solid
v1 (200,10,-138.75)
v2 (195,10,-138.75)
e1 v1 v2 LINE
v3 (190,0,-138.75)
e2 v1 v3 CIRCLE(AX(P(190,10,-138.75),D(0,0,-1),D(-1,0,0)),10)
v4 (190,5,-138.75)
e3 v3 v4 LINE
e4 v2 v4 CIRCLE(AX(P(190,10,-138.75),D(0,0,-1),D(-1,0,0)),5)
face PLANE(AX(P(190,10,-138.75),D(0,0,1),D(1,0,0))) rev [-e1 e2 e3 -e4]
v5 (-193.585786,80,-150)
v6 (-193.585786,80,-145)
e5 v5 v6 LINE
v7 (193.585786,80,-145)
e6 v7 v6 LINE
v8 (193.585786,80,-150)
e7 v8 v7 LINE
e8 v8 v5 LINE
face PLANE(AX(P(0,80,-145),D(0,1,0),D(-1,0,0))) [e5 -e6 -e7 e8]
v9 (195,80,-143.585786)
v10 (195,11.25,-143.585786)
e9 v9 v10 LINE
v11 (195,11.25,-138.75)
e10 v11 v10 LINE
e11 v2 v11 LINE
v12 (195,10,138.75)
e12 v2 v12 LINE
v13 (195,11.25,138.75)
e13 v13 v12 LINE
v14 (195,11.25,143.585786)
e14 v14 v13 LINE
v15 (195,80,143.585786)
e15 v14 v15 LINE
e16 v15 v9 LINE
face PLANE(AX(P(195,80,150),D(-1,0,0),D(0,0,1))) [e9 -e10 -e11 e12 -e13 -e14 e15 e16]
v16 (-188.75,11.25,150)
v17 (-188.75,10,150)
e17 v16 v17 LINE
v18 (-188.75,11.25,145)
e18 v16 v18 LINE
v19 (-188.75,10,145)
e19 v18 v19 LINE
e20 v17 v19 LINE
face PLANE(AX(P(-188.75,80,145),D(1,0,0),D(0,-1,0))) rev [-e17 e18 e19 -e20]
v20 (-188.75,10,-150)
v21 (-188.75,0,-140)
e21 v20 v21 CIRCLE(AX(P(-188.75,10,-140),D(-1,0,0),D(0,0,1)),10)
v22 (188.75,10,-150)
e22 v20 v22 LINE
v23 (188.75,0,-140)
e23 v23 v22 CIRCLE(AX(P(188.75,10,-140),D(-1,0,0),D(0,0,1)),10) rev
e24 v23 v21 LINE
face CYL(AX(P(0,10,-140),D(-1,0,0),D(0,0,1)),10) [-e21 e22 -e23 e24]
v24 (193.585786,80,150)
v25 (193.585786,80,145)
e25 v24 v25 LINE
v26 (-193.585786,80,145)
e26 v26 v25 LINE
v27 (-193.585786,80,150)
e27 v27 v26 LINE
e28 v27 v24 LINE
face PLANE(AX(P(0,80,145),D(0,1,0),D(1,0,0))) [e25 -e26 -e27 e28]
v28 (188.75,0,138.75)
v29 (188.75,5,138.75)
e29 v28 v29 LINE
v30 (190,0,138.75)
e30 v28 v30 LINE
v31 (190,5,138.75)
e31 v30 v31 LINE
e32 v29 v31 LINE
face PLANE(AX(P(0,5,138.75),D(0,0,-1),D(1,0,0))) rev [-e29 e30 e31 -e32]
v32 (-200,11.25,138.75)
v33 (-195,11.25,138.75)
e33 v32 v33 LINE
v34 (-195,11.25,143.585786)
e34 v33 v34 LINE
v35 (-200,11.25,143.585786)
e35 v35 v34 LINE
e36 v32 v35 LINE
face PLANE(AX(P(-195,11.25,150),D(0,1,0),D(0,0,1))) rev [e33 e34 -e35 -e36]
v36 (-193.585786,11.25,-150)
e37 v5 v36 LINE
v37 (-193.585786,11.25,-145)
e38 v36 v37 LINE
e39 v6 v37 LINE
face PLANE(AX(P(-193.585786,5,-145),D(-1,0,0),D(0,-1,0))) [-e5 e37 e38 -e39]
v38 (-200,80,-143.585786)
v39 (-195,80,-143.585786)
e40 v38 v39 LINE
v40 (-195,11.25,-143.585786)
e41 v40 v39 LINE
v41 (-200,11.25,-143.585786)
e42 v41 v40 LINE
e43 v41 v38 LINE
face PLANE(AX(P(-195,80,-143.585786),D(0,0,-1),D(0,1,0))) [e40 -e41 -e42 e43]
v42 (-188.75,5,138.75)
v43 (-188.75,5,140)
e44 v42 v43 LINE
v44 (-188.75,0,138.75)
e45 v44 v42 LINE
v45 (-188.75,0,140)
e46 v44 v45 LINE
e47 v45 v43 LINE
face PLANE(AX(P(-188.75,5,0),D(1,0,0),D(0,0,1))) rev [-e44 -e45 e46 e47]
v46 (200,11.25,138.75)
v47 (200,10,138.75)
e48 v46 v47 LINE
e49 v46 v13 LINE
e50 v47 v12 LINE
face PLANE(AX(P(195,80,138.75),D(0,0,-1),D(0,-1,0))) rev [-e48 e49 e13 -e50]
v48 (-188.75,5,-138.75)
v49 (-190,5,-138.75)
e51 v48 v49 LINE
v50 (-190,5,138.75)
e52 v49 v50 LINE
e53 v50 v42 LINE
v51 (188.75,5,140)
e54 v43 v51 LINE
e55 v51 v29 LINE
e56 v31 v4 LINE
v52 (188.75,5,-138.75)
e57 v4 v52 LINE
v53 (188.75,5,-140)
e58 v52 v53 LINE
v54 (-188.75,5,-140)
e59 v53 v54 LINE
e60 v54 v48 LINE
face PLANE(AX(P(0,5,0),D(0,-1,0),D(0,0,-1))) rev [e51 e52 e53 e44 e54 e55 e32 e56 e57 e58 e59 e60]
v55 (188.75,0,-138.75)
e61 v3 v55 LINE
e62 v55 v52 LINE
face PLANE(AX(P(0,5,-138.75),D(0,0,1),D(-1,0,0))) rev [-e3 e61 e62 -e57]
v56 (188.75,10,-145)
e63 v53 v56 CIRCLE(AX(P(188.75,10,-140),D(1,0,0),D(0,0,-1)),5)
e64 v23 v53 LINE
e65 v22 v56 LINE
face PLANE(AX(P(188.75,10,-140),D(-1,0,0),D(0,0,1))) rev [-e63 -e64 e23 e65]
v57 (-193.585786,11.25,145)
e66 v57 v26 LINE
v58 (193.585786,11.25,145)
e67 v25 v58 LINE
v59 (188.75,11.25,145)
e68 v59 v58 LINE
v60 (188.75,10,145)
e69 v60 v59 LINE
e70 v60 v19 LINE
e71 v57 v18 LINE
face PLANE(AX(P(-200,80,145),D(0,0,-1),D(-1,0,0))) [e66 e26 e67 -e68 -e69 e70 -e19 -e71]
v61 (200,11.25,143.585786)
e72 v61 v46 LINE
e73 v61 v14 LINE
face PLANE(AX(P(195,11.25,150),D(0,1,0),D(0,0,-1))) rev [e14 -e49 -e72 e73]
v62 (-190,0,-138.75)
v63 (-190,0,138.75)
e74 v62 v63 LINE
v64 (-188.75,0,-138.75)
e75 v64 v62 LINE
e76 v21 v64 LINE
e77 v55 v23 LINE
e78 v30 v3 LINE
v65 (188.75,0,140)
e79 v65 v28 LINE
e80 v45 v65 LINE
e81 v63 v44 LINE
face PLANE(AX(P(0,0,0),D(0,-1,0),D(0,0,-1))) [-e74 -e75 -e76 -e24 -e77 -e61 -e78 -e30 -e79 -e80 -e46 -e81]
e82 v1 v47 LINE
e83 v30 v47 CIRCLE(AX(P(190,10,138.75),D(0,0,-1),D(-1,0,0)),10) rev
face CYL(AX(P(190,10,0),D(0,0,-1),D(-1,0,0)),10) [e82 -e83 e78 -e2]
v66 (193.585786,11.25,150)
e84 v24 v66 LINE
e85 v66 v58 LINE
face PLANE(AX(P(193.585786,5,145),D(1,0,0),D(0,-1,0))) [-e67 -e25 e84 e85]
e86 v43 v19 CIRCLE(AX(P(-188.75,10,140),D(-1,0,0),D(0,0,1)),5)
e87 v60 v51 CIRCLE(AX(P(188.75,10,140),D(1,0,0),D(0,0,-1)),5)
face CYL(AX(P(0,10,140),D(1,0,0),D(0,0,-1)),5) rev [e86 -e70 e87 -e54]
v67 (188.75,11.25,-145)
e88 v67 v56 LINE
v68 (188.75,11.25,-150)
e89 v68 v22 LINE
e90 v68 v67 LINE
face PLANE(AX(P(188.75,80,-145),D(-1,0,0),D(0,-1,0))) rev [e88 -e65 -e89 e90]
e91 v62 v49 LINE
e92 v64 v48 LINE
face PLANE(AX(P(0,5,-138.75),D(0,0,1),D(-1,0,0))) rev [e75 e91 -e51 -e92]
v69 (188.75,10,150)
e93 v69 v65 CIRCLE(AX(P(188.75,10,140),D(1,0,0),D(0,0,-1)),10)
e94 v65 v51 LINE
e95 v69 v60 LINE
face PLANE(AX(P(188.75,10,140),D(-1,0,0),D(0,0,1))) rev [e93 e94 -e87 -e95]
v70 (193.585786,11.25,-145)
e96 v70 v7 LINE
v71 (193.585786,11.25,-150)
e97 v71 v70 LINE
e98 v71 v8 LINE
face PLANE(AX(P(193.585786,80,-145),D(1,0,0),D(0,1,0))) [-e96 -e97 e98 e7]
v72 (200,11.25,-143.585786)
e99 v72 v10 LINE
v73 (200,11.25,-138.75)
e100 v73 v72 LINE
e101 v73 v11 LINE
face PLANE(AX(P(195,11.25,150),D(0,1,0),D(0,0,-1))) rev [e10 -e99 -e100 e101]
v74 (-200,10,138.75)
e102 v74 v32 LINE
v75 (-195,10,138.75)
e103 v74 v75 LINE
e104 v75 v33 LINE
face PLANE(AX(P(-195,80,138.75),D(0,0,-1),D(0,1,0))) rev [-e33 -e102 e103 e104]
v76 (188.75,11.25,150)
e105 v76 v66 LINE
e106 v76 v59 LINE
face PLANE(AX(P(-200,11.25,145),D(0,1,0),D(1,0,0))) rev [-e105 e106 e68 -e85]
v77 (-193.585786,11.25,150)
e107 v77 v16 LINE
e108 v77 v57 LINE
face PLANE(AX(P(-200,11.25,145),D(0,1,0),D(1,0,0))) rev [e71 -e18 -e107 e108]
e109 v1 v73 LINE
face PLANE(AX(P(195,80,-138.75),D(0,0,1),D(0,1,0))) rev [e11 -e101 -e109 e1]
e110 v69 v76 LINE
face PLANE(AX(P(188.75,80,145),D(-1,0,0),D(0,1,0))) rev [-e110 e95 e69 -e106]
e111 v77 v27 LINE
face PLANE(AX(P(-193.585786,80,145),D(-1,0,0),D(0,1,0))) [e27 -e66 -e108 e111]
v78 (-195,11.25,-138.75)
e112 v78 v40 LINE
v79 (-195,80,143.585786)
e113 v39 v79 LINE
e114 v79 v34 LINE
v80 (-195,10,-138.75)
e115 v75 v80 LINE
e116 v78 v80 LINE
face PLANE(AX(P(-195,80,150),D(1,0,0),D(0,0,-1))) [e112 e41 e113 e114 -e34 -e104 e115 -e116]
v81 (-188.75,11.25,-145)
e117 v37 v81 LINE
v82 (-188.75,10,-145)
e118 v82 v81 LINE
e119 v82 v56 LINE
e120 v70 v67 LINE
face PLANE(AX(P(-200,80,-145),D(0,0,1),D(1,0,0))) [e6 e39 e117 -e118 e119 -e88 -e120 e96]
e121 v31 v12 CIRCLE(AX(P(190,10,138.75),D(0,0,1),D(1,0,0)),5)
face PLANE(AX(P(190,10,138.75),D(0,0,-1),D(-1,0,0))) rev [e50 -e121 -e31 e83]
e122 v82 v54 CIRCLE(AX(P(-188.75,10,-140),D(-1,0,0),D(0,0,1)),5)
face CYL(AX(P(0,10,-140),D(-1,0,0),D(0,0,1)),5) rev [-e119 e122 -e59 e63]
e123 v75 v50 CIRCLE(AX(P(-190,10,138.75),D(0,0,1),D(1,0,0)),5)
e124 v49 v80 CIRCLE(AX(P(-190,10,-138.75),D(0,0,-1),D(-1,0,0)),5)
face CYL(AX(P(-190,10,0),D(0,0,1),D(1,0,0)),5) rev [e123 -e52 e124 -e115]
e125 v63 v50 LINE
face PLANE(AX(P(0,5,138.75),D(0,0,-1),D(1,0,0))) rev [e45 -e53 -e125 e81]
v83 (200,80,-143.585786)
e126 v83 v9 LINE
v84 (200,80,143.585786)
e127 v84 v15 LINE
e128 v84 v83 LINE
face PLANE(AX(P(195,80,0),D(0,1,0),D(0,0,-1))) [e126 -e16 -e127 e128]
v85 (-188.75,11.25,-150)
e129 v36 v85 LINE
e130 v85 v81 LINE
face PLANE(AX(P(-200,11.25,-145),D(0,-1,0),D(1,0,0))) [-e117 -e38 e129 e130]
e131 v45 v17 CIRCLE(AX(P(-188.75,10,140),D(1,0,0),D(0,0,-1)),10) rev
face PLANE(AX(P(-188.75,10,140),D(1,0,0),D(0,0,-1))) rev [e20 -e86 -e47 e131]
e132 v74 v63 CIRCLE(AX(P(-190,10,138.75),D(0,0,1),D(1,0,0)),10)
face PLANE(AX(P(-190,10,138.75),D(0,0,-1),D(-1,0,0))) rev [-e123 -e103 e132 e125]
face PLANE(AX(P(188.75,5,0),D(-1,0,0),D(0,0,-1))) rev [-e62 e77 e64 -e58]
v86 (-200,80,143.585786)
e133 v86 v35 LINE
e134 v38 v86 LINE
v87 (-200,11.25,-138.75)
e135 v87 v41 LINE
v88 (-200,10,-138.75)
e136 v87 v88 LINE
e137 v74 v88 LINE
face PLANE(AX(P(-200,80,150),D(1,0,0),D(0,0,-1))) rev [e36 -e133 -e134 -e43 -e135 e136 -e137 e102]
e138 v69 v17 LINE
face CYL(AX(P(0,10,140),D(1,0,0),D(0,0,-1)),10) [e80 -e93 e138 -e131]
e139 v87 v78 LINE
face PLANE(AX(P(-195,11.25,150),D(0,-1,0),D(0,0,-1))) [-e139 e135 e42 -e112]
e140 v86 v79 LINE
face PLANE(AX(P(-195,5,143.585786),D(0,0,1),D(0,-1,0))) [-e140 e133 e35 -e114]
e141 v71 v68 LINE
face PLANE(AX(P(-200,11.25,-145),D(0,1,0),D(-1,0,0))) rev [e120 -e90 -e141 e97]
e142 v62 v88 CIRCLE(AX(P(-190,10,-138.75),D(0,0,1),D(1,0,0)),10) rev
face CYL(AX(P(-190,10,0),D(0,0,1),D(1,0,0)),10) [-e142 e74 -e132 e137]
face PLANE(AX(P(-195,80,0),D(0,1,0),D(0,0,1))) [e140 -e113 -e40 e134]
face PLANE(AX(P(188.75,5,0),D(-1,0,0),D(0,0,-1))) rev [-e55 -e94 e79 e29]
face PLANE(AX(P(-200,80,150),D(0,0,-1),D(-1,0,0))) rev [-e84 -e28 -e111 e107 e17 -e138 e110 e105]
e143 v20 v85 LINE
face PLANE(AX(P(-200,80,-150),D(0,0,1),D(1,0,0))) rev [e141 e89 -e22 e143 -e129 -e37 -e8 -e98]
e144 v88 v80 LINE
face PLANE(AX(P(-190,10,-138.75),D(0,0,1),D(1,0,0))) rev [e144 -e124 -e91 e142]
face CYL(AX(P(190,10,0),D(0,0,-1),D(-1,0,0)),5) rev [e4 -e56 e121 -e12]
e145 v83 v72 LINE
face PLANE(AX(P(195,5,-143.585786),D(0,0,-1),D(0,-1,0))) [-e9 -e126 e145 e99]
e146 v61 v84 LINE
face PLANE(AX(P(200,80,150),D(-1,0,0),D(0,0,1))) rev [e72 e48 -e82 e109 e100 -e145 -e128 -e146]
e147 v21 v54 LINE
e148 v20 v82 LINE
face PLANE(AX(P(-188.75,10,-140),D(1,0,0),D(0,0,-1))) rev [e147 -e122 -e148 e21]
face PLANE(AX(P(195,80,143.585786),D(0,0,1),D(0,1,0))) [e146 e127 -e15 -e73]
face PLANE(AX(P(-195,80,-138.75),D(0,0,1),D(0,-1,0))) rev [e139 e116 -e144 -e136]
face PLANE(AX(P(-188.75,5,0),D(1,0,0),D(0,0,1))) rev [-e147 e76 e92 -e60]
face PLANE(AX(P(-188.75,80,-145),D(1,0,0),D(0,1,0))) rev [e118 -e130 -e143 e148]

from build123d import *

# Parameters (mm, degrees)
SKETCH1_W              = 400
SKETCH1_H              = 300
BOSS_EXTRUDE1_DEPTH    = 80
SHELL1_T               = -5
CONVERT_SOLID1_START   = -200
CONVERT_SOLID1_DEPTH   = 400
CONVERT_SOLID1_2_DEPTH = 6.414213562
CONVERT_SOLID1_START_2 = 193.585786438
CONVERT_SOLID1_3_DEPTH = 6.414213562
CONVERT_SOLID1_START_3 = -193.585786438
CONVERT_SOLID1_4_DEPTH = 4.835786438
CONVERT_SOLID1_START_4 = 188.75
CONVERT_SOLID1_5_DEPTH = 4.835786438
CONVERT_SOLID1_START_5 = -188.75
CONVERT_SOLID1_6_DEPTH = 377.5
CONVERT_SOLID1_START_6 = -138.75
CONVERT_SOLID1_7_DEPTH = 277.5
CONVERT_SOLID1_8_DEPTH = 277.5


with BuildPart() as part:
    # Sketch1 → Boss-Extrude1 (new body)
    with BuildSketch(Plane(origin=(0, 0, 0), x_dir=(1, 0, 0), z_dir=(0, 1, 0))):
        Rectangle(SKETCH1_W, SKETCH1_H)
    extrude(amount=BOSS_EXTRUDE1_DEPTH)

    # Shell1
    shell1_openings = [part.faces().sort_by_distance(p)[0] for p in [
        (0, 80, 0),
    ]]
    offset(amount=SHELL1_T, openings=shell1_openings, kind=Kind.INTERSECTION)

    # Convert-Solid1: read off the stored shape, not the designer's step
    # Convert-Solid1 outline → Convert-Solid1 (cut)
    with BuildSketch(Plane.YZ.offset(CONVERT_SOLID1_START)):
        with BuildLine():
            Line((11.25, -138.75), (5, -138.75))
            Line((5, -138.75), (5, -140))
            ThreePointArc((5, -140), (6.464466094, -143.535533906), (10, -145))
            Line((10, -145), (80, -145))
            Line((80, -145), (80, -143.585786438))
            Line((80, -143.585786438), (11.25, -143.585786438))
            Line((11.25, -143.585786438), (11.25, -138.75))
        make_face()
        with BuildLine():
            Line((5, 140), (5, 138.75))
            Line((5, 138.75), (11.25, 138.75))
            Line((11.25, 138.75), (11.25, 143.585786438))
            Line((11.25, 143.585786438), (80, 143.585786438))
            Line((80, 143.585786438), (80, 145))
            Line((80, 145), (10, 145))
            ThreePointArc((10, 145), (6.464466094, 143.535533906), (5, 140))
        make_face()
        with BuildLine():
            ThreePointArc((10, -150), (2.928932188, -147.071067812), (0, -140))
            Line((0, -140), (0, -150))
            Line((0, -150), (10, -150))
        make_face()
        with BuildLine():
            Line((0, 150), (0, 140))
            ThreePointArc((0, 140), (2.928932188, 147.071067812), (10, 150))
            Line((10, 150), (0, 150))
        make_face()
    extrude(amount=CONVERT_SOLID1_DEPTH, mode=Mode.SUBTRACT)

    # Convert-Solid1 2 outline → Convert-Solid1 2 (cut)
    with BuildSketch(Plane.YZ.offset(CONVERT_SOLID1_START)):
        with BuildLine():
            Line((5, -140), (5, -138.75))
            Line((5, -138.75), (0, -138.75))
            Line((0, -138.75), (0, -140))
            ThreePointArc((0, -140), (2.928932188, -147.071067812), (10, -150))
            Line((10, -150), (80, -150))
            Line((80, -150), (80, -145))
            Line((80, -145), (10, -145))
            ThreePointArc((10, -145), (6.464466094, -143.535533906), (5, -140))
        make_face()
        with BuildLine():
            Line((0, 138.75), (5, 138.75))
            Line((5, 138.75), (5, 140))
            ThreePointArc((5, 140), (6.464466094, 143.535533906), (10, 145))
            Line((10, 145), (80, 145))
            Line((80, 145), (80, 150))
            Line((80, 150), (10, 150))
            ThreePointArc((10, 150), (2.928932188, 147.071067812), (0, 140))
            Line((0, 140), (0, 138.75))
        make_face()
    extrude(amount=CONVERT_SOLID1_2_DEPTH, mode=Mode.SUBTRACT)

    # Convert-Solid1 3 outline → Convert-Solid1 3 (cut)
    with BuildSketch(Plane.YZ.offset(CONVERT_SOLID1_START_2)):
        with BuildLine():
            Line((5, -140), (5, -138.75))
            Line((5, -138.75), (0, -138.75))
            Line((0, -138.75), (0, -140))
            ThreePointArc((0, -140), (2.928932188, -147.071067812), (10, -150))
            Line((10, -150), (80, -150))
            Line((80, -150), (80, -145))
            Line((80, -145), (10, -145))
            ThreePointArc((10, -145), (6.464466094, -143.535533906), (5, -140))
        make_face()
        with BuildLine():
            Line((0, 138.75), (5, 138.75))
            Line((5, 138.75), (5, 140))
            ThreePointArc((5, 140), (6.464466094, 143.535533906), (10, 145))
            Line((10, 145), (80, 145))
            Line((80, 145), (80, 150))
            Line((80, 150), (10, 150))
            ThreePointArc((10, 150), (2.928932188, 147.071067812), (0, 140))
            Line((0, 140), (0, 138.75))
        make_face()
    extrude(amount=CONVERT_SOLID1_3_DEPTH, mode=Mode.SUBTRACT)

    # Convert-Solid1 4 outline → Convert-Solid1 4 (cut)
    with BuildSketch(Plane.YZ.offset(CONVERT_SOLID1_START_3)):
        with BuildLine():
            Line((5, -145), (5, -138.75))
            Line((5, -138.75), (0, -138.75))
            Line((0, -138.75), (0, -140))
            ThreePointArc((0, -140), (2.928932188, -147.071067812), (10, -150))
            Line((10, -150), (11.25, -150))
            Line((11.25, -150), (11.25, -145))
            Line((11.25, -145), (5, -145))
        make_face()
        with BuildLine():
            Line((0, 138.75), (5, 138.75))
            Line((5, 138.75), (5, 145))
            Line((5, 145), (11.25, 145))
            Line((11.25, 145), (11.25, 150))
            Line((11.25, 150), (10, 150))
            ThreePointArc((10, 150), (2.928932188, 147.071067812), (0, 140))
            Line((0, 140), (0, 138.75))
        make_face()
    extrude(amount=CONVERT_SOLID1_4_DEPTH, mode=Mode.SUBTRACT)

    # Convert-Solid1 5 outline → Convert-Solid1 5 (cut)
    with BuildSketch(Plane.YZ.offset(CONVERT_SOLID1_START_4)):
        with BuildLine():
            Line((5, -145), (5, -138.75))
            Line((5, -138.75), (0, -138.75))
            Line((0, -138.75), (0, -140))
            ThreePointArc((0, -140), (2.928932188, -147.071067812), (10, -150))
            Line((10, -150), (11.25, -150))
            Line((11.25, -150), (11.25, -145))
            Line((11.25, -145), (5, -145))
        make_face()
        with BuildLine():
            Line((0, 138.75), (5, 138.75))
            Line((5, 138.75), (5, 145))
            Line((5, 145), (11.25, 145))
            Line((11.25, 145), (11.25, 150))
            Line((11.25, 150), (10, 150))
            ThreePointArc((10, 150), (2.928932188, 147.071067812), (0, 140))
            Line((0, 140), (0, 138.75))
        make_face()
    extrude(amount=CONVERT_SOLID1_5_DEPTH, mode=Mode.SUBTRACT)

    # Convert-Solid1 6 outline → Convert-Solid1 6 (add)
    with BuildSketch(Plane.YZ.offset(CONVERT_SOLID1_START_5)):
        with BuildLine():
            ThreePointArc((10, -145), (6.464466094, -143.535533906), (5, -140))
            Line((5, -140), (5, -145))
            Line((5, -145), (10, -145))
        make_face()
        with BuildLine():
            Line((5, 145), (5, 140))
            ThreePointArc((5, 140), (6.464466094, 143.535533906), (10, 145))
            Line((10, 145), (5, 145))
        make_face()
    extrude(amount=CONVERT_SOLID1_6_DEPTH)

    # Convert-Solid1 7 outline → Convert-Solid1 7 (cut)
    with BuildSketch(Plane.XY.offset(CONVERT_SOLID1_START_6)):
        with BuildLine():
            ThreePointArc((200, 10), (197.071067812, 2.928932188), (190, 0))
            Line((190, 0), (200, 0))
            Line((200, 0), (200, 10))
        make_face()
        with BuildLine():
            ThreePointArc((-190, 0), (-197.071067812, 2.928932188), (-200, 10))
            Line((-200, 10), (-200, 0))
            Line((-200, 0), (-190, 0))
        make_face()
    extrude(amount=CONVERT_SOLID1_7_DEPTH, mode=Mode.SUBTRACT)

    # Convert-Solid1 8 outline → Convert-Solid1 8 (add)
    with BuildSketch(Plane.XY.offset(CONVERT_SOLID1_START_6)):
        with BuildLine():
            ThreePointArc((195, 10), (193.535533906, 6.464466094), (190, 5))
            Line((190, 5), (195, 5))
            Line((195, 5), (195, 10))
        make_face()
        with BuildLine():
            ThreePointArc((-190, 5), (-193.535533906, 6.464466094), (-195, 10))
            Line((-195, 10), (-195, 5))
            Line((-195, 5), (-190, 5))
        make_face()
    extrude(amount=CONVERT_SOLID1_8_DEPTH)


solid = part.part
